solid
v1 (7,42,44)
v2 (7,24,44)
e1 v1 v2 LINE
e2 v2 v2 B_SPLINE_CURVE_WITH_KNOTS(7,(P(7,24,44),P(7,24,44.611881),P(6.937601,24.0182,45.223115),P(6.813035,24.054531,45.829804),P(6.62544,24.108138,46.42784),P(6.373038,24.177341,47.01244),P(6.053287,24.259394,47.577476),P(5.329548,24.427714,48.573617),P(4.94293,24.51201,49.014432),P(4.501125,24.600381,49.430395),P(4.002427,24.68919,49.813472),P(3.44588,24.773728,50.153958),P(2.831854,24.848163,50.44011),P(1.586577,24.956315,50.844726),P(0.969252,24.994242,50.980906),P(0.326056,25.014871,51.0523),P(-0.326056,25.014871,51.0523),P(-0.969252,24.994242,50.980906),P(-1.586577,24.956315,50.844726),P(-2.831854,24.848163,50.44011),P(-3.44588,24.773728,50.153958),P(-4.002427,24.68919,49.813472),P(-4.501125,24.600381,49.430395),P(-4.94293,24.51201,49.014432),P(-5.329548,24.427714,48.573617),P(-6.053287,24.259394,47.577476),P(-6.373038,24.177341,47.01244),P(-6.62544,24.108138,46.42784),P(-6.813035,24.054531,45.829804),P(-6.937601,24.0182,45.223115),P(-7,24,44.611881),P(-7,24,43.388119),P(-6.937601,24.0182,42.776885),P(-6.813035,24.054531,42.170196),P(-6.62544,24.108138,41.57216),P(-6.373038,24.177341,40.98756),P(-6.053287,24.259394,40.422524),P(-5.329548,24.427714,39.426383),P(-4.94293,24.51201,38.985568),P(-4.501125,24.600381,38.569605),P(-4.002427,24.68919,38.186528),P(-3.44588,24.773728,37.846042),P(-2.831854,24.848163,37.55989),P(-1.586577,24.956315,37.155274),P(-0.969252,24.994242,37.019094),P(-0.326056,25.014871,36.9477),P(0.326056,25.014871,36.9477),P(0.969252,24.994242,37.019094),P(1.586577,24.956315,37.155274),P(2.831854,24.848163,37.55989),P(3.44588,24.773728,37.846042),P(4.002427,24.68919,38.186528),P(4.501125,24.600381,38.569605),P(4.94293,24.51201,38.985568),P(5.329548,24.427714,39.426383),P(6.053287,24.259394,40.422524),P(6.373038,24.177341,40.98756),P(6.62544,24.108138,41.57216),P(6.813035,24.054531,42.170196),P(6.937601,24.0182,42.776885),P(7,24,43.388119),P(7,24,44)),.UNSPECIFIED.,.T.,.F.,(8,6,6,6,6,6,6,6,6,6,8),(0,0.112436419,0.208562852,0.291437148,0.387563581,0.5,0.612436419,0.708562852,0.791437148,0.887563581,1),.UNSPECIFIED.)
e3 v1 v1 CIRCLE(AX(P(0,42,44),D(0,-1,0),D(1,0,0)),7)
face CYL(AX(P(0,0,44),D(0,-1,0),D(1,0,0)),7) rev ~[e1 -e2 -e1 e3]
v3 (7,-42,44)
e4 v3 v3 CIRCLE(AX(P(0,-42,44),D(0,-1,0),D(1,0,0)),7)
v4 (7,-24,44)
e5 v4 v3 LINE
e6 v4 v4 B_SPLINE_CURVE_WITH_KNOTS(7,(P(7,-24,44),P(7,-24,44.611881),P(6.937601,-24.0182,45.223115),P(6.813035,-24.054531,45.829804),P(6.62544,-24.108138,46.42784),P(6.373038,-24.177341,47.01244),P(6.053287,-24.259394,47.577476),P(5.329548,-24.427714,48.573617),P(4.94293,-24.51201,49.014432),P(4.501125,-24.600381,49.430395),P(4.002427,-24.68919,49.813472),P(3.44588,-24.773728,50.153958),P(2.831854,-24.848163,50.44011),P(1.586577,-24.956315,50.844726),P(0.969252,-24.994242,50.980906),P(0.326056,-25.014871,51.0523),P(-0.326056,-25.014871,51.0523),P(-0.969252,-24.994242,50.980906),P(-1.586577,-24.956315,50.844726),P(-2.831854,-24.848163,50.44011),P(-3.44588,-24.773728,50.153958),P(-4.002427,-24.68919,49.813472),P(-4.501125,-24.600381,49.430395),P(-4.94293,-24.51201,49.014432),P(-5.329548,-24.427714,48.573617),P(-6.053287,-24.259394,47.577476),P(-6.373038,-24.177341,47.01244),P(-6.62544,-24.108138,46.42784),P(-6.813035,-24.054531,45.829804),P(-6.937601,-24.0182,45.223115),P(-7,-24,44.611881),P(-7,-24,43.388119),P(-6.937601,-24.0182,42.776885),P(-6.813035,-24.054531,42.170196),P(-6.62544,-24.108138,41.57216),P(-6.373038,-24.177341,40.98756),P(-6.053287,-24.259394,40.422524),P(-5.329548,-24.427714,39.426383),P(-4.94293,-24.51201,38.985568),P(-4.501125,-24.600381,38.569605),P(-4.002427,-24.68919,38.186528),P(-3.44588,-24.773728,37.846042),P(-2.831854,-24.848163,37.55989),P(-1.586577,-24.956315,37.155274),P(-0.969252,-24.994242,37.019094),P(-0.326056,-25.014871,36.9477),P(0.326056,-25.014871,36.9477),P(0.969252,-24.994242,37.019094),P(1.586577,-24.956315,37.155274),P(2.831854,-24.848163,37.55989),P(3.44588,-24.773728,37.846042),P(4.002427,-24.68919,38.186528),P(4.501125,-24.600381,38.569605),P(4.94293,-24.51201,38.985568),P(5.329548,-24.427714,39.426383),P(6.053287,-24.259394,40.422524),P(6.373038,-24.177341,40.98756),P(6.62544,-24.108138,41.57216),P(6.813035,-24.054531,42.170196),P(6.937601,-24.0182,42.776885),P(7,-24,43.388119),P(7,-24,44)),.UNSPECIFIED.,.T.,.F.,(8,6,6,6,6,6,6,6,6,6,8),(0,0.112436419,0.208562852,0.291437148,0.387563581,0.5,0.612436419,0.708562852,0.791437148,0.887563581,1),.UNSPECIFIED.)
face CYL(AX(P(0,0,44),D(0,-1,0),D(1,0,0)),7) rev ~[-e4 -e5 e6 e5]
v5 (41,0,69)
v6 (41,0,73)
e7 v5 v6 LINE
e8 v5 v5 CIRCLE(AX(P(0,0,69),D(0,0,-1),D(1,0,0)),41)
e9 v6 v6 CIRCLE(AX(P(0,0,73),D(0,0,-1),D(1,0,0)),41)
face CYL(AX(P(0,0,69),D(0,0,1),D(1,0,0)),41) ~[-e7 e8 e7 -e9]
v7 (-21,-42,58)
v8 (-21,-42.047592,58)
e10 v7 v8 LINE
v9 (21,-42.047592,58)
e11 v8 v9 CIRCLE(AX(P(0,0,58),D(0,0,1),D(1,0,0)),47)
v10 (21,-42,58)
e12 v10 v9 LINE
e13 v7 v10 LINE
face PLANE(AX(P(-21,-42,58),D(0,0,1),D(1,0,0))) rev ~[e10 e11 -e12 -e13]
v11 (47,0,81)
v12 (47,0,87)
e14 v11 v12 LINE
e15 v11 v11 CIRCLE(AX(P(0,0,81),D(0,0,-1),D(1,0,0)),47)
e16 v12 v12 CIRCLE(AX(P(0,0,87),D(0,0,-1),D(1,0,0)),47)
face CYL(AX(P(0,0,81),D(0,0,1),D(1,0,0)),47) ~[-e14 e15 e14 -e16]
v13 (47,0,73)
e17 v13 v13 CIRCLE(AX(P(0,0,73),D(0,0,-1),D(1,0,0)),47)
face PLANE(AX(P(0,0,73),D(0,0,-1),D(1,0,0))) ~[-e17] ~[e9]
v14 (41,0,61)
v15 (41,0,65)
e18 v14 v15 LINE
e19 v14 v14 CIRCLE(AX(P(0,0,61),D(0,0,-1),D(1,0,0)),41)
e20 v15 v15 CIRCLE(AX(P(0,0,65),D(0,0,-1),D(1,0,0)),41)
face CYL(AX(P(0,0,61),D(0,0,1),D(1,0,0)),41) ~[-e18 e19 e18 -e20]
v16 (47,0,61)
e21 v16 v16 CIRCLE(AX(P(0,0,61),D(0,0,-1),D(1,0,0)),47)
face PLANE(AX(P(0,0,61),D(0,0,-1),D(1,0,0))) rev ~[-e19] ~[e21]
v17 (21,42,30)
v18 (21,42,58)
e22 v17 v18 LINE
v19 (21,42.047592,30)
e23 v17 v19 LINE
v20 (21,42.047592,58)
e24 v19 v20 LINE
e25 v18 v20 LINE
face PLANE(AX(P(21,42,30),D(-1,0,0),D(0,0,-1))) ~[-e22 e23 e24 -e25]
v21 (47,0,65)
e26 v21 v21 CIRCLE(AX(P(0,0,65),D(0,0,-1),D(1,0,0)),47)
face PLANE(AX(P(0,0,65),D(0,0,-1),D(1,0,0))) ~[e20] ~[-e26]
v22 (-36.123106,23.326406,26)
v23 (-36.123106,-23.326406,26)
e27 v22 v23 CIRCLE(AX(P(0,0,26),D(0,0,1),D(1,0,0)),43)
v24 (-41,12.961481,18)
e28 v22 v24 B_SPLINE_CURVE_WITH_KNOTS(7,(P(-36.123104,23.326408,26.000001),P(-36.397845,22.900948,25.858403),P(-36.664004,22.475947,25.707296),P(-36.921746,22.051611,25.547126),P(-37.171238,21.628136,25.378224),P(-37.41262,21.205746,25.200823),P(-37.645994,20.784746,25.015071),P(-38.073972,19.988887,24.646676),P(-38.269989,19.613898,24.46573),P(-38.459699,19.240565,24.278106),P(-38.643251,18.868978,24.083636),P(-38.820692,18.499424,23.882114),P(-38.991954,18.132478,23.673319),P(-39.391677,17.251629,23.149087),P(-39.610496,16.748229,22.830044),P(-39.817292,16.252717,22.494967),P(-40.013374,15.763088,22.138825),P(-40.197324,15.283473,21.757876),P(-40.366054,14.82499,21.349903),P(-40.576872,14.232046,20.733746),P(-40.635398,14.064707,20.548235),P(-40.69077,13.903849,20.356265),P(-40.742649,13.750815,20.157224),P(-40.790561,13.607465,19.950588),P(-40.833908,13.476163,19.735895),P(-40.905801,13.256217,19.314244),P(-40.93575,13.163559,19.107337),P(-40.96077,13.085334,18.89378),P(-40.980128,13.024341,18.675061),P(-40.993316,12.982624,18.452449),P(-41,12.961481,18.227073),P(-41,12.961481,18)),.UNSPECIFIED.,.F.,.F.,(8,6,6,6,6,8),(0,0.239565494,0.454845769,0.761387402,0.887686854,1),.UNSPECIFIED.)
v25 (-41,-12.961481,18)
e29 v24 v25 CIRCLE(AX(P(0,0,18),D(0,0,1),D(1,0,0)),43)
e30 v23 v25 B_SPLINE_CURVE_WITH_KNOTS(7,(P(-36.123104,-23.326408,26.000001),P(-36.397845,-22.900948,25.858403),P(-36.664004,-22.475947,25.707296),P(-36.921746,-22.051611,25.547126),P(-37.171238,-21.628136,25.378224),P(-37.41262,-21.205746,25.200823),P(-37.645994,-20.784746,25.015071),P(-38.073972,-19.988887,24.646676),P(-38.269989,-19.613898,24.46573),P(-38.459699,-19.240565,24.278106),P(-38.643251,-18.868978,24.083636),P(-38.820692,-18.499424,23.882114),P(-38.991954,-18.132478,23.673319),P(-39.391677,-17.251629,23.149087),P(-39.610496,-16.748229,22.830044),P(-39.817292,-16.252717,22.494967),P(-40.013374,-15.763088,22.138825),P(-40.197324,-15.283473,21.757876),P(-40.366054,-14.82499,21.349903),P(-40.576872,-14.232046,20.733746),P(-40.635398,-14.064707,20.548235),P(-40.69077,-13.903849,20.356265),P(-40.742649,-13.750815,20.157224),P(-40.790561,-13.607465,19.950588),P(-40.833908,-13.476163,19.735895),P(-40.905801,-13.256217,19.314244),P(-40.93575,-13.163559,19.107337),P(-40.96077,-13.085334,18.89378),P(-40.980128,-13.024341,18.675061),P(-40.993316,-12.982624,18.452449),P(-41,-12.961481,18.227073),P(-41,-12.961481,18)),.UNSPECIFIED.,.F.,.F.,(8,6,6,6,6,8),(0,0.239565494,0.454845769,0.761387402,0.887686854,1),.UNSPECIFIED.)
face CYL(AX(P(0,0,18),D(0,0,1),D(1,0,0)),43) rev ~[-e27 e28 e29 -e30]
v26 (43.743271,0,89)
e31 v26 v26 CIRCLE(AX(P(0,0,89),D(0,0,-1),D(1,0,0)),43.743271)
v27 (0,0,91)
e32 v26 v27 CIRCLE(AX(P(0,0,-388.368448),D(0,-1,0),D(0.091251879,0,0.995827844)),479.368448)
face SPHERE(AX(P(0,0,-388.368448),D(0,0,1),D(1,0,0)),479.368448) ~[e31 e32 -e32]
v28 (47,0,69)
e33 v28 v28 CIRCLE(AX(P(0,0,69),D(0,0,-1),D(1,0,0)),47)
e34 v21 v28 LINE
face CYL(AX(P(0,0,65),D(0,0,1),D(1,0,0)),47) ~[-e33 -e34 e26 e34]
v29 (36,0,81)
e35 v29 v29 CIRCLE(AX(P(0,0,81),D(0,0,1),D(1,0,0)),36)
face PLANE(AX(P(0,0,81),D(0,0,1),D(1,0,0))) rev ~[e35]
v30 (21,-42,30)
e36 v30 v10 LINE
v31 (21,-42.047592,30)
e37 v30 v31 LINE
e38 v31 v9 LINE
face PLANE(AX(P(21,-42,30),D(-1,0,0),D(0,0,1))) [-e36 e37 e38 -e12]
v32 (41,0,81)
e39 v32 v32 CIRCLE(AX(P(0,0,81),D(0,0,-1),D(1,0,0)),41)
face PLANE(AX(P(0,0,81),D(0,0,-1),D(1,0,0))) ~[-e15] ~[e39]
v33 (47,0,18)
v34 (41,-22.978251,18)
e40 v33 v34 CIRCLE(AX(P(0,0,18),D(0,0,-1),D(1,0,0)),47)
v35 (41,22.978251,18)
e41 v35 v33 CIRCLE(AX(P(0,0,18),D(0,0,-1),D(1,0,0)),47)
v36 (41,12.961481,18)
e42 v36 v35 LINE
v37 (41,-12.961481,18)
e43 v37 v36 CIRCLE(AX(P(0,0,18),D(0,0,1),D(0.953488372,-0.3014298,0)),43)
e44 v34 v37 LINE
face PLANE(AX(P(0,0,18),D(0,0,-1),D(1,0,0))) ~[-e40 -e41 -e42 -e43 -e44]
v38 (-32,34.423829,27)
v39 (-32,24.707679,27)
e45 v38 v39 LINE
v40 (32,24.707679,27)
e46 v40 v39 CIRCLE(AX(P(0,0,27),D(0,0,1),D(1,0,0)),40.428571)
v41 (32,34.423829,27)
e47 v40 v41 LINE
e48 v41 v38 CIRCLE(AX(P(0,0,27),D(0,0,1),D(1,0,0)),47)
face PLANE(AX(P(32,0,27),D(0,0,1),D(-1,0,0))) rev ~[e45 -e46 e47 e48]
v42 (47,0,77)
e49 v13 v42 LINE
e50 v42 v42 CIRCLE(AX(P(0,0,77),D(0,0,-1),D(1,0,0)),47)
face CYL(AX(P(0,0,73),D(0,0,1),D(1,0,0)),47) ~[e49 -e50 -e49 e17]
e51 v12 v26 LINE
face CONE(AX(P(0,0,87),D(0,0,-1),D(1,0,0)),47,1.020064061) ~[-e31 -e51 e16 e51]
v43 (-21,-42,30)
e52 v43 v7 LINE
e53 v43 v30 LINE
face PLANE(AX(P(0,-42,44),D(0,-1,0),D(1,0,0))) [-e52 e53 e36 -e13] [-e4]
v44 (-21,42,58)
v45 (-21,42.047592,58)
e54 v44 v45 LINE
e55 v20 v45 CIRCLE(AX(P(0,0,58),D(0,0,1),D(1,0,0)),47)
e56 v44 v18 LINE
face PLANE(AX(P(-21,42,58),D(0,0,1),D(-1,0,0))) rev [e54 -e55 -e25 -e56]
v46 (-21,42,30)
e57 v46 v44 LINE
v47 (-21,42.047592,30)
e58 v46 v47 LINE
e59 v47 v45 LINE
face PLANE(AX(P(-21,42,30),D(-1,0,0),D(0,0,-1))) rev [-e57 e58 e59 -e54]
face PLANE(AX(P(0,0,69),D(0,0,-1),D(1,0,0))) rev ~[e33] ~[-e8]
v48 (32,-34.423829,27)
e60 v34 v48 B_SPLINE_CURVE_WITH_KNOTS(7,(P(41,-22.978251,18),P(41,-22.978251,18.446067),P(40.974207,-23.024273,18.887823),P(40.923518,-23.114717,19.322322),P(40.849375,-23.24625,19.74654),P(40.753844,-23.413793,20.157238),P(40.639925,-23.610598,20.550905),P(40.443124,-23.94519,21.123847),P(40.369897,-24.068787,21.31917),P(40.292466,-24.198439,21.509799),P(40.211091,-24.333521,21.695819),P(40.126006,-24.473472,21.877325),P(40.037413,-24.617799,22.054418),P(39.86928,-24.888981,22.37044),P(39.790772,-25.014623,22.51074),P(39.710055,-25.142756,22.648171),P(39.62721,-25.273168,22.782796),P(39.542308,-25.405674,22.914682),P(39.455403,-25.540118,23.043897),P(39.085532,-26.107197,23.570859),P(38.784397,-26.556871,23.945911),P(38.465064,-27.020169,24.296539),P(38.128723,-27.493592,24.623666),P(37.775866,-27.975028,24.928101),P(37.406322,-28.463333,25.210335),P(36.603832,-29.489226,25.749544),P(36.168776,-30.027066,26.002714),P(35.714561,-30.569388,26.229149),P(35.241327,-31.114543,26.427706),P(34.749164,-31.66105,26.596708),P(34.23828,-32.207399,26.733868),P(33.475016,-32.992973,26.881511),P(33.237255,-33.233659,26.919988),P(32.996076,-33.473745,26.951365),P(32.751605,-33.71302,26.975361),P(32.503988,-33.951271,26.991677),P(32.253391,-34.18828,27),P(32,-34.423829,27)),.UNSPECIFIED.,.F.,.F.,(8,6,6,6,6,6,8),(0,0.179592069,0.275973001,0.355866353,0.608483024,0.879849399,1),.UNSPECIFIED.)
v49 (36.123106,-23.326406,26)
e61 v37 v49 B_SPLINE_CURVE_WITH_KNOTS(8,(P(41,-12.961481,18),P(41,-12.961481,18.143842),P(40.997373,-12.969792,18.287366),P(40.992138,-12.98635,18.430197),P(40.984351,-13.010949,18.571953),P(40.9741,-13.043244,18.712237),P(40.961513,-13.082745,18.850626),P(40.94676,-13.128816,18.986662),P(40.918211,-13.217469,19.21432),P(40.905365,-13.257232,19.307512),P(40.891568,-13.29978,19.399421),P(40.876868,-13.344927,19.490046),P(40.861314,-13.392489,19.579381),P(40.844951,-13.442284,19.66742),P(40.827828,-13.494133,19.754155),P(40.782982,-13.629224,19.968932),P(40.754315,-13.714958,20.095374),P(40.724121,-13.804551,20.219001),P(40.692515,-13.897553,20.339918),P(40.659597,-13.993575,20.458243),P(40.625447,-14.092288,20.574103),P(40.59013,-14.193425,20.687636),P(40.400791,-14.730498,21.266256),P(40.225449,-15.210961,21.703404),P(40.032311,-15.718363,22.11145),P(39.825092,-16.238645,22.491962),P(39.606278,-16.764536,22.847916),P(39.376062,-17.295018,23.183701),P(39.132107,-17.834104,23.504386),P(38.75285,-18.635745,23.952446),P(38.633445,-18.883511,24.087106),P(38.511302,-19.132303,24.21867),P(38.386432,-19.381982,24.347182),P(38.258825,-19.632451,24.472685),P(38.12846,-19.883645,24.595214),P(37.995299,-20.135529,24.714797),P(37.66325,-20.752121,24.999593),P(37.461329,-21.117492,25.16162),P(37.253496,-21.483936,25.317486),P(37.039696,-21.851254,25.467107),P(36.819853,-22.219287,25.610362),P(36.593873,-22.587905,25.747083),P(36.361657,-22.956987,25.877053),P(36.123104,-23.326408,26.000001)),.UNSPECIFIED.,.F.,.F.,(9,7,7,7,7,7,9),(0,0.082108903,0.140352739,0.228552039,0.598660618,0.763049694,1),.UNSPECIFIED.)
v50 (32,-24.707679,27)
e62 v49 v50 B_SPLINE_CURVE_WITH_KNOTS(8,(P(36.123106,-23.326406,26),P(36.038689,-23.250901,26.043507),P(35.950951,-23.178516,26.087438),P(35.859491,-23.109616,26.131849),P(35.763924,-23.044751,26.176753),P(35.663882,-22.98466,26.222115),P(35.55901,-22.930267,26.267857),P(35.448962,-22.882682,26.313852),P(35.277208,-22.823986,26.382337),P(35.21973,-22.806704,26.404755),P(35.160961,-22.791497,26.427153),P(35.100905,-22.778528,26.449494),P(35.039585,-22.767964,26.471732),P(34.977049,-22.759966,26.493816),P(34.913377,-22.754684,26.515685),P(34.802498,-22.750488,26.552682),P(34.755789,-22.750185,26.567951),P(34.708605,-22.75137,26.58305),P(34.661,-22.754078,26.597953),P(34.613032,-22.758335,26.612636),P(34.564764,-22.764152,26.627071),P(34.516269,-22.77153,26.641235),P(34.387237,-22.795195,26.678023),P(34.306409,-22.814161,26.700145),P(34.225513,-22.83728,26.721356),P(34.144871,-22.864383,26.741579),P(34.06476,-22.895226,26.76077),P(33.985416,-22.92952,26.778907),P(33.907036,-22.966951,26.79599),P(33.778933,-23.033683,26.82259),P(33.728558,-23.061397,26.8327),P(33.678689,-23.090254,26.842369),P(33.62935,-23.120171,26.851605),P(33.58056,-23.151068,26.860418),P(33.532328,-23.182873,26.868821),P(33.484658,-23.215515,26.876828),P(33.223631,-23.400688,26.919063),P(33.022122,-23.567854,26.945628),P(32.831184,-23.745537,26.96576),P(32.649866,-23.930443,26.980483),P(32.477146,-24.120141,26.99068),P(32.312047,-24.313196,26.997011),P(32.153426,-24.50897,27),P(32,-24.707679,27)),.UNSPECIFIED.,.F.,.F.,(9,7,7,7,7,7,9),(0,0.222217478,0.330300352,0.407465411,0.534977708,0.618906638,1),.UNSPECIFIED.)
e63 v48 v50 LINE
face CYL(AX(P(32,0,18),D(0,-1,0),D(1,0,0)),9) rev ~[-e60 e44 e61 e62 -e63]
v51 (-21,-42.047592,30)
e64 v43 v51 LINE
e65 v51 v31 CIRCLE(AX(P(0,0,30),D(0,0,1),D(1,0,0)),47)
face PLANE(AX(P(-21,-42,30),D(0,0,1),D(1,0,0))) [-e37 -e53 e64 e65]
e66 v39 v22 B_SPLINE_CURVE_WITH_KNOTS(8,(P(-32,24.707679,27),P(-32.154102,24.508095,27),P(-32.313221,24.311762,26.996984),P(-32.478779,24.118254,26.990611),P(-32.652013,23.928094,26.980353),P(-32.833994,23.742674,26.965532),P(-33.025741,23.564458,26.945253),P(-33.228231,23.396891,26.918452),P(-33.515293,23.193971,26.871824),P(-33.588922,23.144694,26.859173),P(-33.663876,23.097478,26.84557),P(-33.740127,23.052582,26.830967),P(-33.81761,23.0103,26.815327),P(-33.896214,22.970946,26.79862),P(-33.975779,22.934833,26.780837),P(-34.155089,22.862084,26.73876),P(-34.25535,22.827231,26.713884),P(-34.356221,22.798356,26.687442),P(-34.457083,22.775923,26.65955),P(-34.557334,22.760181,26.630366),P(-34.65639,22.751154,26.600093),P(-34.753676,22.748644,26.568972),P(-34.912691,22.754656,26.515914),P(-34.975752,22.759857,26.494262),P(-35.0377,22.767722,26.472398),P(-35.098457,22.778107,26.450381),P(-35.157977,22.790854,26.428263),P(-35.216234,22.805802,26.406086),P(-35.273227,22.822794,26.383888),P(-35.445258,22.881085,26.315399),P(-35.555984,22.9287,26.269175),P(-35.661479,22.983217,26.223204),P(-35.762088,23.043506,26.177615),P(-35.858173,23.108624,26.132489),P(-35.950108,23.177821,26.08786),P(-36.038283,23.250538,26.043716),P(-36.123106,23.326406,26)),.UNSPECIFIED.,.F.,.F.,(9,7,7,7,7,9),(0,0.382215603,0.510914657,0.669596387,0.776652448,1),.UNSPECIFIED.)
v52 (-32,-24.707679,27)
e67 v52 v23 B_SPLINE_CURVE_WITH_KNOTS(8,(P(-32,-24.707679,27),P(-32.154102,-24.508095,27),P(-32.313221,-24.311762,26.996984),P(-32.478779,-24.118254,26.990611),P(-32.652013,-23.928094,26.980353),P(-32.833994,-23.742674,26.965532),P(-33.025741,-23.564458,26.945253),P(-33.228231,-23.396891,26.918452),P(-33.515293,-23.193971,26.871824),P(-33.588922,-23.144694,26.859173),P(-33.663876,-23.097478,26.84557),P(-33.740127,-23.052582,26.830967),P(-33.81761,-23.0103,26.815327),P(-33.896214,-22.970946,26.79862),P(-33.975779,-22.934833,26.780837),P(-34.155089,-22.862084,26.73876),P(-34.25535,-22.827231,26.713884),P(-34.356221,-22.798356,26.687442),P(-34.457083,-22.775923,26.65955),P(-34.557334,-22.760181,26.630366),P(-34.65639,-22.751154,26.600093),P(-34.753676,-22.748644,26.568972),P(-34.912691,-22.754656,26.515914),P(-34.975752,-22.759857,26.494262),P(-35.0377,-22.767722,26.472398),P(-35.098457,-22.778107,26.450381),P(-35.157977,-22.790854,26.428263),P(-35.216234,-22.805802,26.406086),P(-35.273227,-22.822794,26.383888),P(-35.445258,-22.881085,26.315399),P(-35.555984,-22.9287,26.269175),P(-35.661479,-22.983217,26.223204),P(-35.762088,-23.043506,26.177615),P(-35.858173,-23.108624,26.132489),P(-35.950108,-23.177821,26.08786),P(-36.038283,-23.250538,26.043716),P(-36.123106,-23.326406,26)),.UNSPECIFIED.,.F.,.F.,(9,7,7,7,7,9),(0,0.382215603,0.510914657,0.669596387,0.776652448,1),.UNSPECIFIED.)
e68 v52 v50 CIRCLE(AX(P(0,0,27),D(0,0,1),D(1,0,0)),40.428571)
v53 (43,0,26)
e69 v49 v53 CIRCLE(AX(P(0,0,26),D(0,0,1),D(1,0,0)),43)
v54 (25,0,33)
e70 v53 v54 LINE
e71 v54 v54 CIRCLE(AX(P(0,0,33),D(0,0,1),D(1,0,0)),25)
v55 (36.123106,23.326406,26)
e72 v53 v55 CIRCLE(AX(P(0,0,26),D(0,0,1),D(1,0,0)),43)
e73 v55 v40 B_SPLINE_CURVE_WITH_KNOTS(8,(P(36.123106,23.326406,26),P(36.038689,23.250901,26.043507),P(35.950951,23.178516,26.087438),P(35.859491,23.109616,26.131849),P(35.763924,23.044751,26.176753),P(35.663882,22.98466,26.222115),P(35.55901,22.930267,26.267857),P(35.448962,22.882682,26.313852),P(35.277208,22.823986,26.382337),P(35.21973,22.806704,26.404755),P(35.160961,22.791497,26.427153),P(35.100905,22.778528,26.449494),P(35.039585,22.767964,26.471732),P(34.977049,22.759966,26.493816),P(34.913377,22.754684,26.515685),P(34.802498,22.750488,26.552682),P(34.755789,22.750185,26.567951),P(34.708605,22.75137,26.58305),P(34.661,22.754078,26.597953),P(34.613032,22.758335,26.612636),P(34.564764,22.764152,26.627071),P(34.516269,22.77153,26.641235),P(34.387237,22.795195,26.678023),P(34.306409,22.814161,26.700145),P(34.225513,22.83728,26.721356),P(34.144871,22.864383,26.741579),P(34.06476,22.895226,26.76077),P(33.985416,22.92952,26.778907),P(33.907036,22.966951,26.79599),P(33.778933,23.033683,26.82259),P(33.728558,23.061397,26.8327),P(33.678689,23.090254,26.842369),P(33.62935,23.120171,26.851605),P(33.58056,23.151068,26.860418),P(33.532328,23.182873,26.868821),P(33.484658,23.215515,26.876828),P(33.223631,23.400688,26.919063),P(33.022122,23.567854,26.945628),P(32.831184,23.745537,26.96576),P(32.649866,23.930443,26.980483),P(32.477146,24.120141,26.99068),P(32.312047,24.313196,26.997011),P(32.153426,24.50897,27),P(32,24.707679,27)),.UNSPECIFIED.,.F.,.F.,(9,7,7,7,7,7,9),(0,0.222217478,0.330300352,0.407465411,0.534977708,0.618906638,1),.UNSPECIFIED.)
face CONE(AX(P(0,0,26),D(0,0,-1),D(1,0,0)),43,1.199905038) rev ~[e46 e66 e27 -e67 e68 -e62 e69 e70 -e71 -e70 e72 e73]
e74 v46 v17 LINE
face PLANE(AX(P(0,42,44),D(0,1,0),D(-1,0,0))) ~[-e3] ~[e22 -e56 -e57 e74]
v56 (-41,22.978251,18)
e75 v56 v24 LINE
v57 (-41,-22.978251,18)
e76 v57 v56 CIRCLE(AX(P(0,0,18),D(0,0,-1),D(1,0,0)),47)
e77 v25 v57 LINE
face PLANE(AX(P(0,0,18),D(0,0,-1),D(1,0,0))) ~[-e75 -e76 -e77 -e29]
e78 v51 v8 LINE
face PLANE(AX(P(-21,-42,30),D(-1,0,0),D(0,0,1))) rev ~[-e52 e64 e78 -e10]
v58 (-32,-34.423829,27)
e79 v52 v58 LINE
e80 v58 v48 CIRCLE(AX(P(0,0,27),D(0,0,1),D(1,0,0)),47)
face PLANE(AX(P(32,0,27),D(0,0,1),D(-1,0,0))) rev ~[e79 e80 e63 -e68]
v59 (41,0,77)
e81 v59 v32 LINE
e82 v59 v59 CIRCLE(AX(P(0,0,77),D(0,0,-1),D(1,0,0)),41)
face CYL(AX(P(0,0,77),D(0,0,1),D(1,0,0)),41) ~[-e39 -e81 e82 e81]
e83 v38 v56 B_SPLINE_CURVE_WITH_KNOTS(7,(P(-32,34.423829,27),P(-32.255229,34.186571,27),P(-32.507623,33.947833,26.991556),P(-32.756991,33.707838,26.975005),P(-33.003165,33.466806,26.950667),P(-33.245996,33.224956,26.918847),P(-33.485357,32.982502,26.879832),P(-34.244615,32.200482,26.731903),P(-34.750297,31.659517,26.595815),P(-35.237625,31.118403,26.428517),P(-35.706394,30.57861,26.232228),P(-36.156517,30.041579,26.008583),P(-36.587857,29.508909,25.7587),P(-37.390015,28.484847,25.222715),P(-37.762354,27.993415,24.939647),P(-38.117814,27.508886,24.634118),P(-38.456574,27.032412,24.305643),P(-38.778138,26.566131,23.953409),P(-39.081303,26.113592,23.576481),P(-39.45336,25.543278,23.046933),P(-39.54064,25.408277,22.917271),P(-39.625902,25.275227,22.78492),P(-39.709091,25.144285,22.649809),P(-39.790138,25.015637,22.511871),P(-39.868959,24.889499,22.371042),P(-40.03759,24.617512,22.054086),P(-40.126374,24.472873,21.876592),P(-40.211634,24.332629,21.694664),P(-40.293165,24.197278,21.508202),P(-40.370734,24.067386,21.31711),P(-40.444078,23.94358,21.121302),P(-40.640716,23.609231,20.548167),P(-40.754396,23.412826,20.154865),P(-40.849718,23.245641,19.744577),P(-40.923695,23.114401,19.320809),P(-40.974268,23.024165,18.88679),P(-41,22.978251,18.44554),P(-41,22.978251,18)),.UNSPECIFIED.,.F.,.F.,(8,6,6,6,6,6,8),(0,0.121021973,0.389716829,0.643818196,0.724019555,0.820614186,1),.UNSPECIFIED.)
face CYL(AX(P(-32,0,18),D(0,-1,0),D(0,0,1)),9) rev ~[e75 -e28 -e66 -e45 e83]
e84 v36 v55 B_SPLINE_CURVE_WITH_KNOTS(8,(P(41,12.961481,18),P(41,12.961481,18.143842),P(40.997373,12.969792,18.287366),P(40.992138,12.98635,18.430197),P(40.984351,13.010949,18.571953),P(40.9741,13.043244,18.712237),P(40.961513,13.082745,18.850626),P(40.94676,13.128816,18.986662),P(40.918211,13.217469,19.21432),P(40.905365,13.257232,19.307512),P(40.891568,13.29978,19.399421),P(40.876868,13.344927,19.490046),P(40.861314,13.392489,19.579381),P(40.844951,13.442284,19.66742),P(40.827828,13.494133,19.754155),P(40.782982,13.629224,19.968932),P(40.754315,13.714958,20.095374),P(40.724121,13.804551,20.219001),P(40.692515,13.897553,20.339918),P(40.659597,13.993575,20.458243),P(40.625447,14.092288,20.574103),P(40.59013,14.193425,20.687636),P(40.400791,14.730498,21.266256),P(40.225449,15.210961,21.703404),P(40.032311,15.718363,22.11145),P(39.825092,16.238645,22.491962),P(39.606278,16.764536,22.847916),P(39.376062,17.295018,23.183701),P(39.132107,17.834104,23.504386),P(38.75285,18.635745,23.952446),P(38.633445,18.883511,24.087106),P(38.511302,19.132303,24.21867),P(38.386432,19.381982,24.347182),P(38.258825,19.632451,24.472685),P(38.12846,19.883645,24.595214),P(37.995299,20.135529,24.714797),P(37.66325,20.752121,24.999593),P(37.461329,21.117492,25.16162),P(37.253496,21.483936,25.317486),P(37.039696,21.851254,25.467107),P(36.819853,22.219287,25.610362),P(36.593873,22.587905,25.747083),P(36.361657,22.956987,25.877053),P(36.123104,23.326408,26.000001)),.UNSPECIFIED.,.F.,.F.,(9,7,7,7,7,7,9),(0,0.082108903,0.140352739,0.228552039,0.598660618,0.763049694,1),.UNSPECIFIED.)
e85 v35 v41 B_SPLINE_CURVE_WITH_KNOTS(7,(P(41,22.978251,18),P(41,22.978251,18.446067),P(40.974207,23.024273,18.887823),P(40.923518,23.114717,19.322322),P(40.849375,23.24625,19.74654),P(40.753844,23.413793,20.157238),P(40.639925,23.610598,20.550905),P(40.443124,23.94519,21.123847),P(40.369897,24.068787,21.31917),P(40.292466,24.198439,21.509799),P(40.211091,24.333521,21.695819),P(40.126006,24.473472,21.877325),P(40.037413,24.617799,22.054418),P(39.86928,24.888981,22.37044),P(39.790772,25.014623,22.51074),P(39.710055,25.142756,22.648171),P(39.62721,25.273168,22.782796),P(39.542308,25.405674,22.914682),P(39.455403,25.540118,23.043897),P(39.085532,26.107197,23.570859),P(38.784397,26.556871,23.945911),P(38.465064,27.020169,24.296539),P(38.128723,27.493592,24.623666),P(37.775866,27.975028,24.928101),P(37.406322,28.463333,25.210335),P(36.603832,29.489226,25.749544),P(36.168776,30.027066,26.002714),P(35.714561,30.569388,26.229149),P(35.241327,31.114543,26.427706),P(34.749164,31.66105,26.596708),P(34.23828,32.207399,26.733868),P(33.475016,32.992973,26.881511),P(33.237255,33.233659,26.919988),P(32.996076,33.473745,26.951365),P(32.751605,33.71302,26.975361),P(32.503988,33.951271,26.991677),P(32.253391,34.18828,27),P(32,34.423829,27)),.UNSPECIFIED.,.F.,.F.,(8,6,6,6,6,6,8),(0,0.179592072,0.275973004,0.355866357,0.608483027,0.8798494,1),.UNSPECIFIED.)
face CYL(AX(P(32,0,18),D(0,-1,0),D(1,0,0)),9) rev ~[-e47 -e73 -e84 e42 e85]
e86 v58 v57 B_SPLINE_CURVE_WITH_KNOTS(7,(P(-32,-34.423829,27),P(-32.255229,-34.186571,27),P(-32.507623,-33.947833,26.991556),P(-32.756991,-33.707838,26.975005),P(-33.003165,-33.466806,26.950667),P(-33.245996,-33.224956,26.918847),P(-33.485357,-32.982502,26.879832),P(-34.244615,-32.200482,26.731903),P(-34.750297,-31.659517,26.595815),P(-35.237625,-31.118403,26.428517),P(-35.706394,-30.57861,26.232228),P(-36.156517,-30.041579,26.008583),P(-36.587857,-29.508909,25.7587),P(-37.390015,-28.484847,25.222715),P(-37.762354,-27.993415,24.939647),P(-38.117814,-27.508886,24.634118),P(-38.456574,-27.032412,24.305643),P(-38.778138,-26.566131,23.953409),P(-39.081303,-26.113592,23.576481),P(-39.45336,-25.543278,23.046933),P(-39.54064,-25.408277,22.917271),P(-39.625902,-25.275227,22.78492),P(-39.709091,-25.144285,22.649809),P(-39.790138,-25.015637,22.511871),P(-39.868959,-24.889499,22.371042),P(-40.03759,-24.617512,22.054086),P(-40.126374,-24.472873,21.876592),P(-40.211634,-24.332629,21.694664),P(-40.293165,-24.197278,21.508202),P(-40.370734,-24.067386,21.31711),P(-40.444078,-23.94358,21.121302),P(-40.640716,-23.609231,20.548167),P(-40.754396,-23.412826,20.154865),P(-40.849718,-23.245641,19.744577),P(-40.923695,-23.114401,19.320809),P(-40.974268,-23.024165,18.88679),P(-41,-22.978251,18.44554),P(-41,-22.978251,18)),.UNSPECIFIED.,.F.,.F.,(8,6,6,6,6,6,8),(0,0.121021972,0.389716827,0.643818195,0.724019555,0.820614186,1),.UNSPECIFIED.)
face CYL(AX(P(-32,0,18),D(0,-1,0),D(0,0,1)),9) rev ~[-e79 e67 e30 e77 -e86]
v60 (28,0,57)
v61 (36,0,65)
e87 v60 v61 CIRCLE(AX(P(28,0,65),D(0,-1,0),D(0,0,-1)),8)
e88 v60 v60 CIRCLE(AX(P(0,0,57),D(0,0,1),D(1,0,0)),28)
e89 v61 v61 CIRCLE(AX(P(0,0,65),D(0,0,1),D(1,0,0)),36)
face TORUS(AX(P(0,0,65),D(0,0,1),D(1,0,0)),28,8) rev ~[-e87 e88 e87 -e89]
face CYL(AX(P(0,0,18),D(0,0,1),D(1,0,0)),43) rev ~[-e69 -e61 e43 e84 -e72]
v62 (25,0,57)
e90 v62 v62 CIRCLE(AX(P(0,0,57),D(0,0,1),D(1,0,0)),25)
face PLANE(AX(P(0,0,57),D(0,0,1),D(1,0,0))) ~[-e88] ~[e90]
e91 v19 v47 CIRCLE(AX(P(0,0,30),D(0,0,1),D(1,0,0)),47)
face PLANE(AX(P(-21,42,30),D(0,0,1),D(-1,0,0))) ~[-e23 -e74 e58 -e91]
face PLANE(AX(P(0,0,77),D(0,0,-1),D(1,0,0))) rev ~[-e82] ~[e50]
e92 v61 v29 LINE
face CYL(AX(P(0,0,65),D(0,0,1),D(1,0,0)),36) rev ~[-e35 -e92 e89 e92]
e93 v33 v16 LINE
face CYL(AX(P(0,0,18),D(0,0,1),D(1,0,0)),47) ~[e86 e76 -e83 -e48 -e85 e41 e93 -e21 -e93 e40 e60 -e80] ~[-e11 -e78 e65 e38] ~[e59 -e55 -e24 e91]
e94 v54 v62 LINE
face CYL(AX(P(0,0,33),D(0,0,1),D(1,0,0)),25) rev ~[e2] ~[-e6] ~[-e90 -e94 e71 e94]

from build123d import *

# Parameters (mm, degrees)
F2_R     = 7
F3_DEPTH = 72
F5_START = 42
F4_W     = 42
F4_H     = 28
F4_R     = 7
F5_DEPTH = 28.7
F9_DEPTH = 211.3


# Not quite as in the source:
# - a pattern or mirror of a feature is missing from the dataset's text; its kind, count and spacing are read off the source's solid


with BuildPart() as f1:
    # F0 (on Front) → F1 (revolve)
    with BuildSketch(Plane.XZ):
        with BuildLine():
            Line((47, 87), (43.7432713807, 89))
            ThreePointArc((43.7432713807, 89), (21.8944844144, 90.4997389679), (0, 91))
            Line((0, 91), (0, 18))
            Line((0, 18), (47, 18))
            Line((47, 18), (47, 33))
            Line((47, 33), (47, 57))
            Line((47, 57), (47, 61))
            Line((47, 61), (41, 61))
            Line((41, 61), (41, 65))
            Line((41, 65), (47, 65))
            Line((47, 65), (47, 69))
            Line((47, 69), (41, 69))
            Line((41, 69), (41, 73))
            Line((41, 73), (47, 73))
            Line((47, 73), (47, 77))
            Line((47, 77), (41, 77))
            Line((41, 77), (41, 81))
            Line((41, 81), (47, 81))
            Line((47, 81), (47, 87))
        make_face()
    revolve(axis=Axis((0, 0, 45.5), (0, 0, -1)))

    # F2 (on Front) → F3 (cut, symmetric)
    with BuildSketch(Plane.XZ):
        with Locations((0, 44)):
            Circle(F2_R)
    extrude(amount=F3_DEPTH, both=True, mode=Mode.SUBTRACT)

    # F4 (on Front) → F5 (cut)
    with BuildSketch(Plane.XZ.offset(F5_START)):
        with Locations((0, 44)):
            Rectangle(F4_W, F4_H)
        with Locations((0, 44)):
            Circle(F4_R, mode=Mode.SUBTRACT)
    f5 = extrude(amount=F5_DEPTH, mode=Mode.SUBTRACT)

    # F5_copies: F5 across plane
    add(f5.mirror(Plane.ZX), mode=Mode.SUBTRACT)

    # F6 (on Front) → F7 (revolve, cut)
    with BuildSketch(Plane.XZ):
        with BuildLine():
            Line((0, 81), (0, 18))
            Line((0, 18), (43, 18))
            Line((43, 18), (43, 26))
            Line((43, 26), (25, 33))
            Line((25, 33), (25, 57))
            Line((25, 57), (28, 57))
            ThreePointArc((28, 57), (33.6568542495, 59.3431457505), (36, 65))
            Line((36, 65), (36, 81))
            Line((36, 81), (0, 81))
        make_face()
    revolve(axis=Axis((0, 0, 34.176344052), (0, 0, 1)), mode=Mode.SUBTRACT)

    # F8 (on Front) → F9 (cut, symmetric)
    with BuildSketch(Plane.XZ):
        with BuildLine():
            Line((32, 27), (-32, 27))
            ThreePointArc((-32, 27), (-38.3639610307, 24.3639610307), (-41, 18))
            Line((-41, 18), (41, 18))
            ThreePointArc((41, 18), (38.3639610307, 24.3639610307), (32, 27))
        make_face()
    extrude(amount=F9_DEPTH, both=True, mode=Mode.SUBTRACT)


solid = f1.part
